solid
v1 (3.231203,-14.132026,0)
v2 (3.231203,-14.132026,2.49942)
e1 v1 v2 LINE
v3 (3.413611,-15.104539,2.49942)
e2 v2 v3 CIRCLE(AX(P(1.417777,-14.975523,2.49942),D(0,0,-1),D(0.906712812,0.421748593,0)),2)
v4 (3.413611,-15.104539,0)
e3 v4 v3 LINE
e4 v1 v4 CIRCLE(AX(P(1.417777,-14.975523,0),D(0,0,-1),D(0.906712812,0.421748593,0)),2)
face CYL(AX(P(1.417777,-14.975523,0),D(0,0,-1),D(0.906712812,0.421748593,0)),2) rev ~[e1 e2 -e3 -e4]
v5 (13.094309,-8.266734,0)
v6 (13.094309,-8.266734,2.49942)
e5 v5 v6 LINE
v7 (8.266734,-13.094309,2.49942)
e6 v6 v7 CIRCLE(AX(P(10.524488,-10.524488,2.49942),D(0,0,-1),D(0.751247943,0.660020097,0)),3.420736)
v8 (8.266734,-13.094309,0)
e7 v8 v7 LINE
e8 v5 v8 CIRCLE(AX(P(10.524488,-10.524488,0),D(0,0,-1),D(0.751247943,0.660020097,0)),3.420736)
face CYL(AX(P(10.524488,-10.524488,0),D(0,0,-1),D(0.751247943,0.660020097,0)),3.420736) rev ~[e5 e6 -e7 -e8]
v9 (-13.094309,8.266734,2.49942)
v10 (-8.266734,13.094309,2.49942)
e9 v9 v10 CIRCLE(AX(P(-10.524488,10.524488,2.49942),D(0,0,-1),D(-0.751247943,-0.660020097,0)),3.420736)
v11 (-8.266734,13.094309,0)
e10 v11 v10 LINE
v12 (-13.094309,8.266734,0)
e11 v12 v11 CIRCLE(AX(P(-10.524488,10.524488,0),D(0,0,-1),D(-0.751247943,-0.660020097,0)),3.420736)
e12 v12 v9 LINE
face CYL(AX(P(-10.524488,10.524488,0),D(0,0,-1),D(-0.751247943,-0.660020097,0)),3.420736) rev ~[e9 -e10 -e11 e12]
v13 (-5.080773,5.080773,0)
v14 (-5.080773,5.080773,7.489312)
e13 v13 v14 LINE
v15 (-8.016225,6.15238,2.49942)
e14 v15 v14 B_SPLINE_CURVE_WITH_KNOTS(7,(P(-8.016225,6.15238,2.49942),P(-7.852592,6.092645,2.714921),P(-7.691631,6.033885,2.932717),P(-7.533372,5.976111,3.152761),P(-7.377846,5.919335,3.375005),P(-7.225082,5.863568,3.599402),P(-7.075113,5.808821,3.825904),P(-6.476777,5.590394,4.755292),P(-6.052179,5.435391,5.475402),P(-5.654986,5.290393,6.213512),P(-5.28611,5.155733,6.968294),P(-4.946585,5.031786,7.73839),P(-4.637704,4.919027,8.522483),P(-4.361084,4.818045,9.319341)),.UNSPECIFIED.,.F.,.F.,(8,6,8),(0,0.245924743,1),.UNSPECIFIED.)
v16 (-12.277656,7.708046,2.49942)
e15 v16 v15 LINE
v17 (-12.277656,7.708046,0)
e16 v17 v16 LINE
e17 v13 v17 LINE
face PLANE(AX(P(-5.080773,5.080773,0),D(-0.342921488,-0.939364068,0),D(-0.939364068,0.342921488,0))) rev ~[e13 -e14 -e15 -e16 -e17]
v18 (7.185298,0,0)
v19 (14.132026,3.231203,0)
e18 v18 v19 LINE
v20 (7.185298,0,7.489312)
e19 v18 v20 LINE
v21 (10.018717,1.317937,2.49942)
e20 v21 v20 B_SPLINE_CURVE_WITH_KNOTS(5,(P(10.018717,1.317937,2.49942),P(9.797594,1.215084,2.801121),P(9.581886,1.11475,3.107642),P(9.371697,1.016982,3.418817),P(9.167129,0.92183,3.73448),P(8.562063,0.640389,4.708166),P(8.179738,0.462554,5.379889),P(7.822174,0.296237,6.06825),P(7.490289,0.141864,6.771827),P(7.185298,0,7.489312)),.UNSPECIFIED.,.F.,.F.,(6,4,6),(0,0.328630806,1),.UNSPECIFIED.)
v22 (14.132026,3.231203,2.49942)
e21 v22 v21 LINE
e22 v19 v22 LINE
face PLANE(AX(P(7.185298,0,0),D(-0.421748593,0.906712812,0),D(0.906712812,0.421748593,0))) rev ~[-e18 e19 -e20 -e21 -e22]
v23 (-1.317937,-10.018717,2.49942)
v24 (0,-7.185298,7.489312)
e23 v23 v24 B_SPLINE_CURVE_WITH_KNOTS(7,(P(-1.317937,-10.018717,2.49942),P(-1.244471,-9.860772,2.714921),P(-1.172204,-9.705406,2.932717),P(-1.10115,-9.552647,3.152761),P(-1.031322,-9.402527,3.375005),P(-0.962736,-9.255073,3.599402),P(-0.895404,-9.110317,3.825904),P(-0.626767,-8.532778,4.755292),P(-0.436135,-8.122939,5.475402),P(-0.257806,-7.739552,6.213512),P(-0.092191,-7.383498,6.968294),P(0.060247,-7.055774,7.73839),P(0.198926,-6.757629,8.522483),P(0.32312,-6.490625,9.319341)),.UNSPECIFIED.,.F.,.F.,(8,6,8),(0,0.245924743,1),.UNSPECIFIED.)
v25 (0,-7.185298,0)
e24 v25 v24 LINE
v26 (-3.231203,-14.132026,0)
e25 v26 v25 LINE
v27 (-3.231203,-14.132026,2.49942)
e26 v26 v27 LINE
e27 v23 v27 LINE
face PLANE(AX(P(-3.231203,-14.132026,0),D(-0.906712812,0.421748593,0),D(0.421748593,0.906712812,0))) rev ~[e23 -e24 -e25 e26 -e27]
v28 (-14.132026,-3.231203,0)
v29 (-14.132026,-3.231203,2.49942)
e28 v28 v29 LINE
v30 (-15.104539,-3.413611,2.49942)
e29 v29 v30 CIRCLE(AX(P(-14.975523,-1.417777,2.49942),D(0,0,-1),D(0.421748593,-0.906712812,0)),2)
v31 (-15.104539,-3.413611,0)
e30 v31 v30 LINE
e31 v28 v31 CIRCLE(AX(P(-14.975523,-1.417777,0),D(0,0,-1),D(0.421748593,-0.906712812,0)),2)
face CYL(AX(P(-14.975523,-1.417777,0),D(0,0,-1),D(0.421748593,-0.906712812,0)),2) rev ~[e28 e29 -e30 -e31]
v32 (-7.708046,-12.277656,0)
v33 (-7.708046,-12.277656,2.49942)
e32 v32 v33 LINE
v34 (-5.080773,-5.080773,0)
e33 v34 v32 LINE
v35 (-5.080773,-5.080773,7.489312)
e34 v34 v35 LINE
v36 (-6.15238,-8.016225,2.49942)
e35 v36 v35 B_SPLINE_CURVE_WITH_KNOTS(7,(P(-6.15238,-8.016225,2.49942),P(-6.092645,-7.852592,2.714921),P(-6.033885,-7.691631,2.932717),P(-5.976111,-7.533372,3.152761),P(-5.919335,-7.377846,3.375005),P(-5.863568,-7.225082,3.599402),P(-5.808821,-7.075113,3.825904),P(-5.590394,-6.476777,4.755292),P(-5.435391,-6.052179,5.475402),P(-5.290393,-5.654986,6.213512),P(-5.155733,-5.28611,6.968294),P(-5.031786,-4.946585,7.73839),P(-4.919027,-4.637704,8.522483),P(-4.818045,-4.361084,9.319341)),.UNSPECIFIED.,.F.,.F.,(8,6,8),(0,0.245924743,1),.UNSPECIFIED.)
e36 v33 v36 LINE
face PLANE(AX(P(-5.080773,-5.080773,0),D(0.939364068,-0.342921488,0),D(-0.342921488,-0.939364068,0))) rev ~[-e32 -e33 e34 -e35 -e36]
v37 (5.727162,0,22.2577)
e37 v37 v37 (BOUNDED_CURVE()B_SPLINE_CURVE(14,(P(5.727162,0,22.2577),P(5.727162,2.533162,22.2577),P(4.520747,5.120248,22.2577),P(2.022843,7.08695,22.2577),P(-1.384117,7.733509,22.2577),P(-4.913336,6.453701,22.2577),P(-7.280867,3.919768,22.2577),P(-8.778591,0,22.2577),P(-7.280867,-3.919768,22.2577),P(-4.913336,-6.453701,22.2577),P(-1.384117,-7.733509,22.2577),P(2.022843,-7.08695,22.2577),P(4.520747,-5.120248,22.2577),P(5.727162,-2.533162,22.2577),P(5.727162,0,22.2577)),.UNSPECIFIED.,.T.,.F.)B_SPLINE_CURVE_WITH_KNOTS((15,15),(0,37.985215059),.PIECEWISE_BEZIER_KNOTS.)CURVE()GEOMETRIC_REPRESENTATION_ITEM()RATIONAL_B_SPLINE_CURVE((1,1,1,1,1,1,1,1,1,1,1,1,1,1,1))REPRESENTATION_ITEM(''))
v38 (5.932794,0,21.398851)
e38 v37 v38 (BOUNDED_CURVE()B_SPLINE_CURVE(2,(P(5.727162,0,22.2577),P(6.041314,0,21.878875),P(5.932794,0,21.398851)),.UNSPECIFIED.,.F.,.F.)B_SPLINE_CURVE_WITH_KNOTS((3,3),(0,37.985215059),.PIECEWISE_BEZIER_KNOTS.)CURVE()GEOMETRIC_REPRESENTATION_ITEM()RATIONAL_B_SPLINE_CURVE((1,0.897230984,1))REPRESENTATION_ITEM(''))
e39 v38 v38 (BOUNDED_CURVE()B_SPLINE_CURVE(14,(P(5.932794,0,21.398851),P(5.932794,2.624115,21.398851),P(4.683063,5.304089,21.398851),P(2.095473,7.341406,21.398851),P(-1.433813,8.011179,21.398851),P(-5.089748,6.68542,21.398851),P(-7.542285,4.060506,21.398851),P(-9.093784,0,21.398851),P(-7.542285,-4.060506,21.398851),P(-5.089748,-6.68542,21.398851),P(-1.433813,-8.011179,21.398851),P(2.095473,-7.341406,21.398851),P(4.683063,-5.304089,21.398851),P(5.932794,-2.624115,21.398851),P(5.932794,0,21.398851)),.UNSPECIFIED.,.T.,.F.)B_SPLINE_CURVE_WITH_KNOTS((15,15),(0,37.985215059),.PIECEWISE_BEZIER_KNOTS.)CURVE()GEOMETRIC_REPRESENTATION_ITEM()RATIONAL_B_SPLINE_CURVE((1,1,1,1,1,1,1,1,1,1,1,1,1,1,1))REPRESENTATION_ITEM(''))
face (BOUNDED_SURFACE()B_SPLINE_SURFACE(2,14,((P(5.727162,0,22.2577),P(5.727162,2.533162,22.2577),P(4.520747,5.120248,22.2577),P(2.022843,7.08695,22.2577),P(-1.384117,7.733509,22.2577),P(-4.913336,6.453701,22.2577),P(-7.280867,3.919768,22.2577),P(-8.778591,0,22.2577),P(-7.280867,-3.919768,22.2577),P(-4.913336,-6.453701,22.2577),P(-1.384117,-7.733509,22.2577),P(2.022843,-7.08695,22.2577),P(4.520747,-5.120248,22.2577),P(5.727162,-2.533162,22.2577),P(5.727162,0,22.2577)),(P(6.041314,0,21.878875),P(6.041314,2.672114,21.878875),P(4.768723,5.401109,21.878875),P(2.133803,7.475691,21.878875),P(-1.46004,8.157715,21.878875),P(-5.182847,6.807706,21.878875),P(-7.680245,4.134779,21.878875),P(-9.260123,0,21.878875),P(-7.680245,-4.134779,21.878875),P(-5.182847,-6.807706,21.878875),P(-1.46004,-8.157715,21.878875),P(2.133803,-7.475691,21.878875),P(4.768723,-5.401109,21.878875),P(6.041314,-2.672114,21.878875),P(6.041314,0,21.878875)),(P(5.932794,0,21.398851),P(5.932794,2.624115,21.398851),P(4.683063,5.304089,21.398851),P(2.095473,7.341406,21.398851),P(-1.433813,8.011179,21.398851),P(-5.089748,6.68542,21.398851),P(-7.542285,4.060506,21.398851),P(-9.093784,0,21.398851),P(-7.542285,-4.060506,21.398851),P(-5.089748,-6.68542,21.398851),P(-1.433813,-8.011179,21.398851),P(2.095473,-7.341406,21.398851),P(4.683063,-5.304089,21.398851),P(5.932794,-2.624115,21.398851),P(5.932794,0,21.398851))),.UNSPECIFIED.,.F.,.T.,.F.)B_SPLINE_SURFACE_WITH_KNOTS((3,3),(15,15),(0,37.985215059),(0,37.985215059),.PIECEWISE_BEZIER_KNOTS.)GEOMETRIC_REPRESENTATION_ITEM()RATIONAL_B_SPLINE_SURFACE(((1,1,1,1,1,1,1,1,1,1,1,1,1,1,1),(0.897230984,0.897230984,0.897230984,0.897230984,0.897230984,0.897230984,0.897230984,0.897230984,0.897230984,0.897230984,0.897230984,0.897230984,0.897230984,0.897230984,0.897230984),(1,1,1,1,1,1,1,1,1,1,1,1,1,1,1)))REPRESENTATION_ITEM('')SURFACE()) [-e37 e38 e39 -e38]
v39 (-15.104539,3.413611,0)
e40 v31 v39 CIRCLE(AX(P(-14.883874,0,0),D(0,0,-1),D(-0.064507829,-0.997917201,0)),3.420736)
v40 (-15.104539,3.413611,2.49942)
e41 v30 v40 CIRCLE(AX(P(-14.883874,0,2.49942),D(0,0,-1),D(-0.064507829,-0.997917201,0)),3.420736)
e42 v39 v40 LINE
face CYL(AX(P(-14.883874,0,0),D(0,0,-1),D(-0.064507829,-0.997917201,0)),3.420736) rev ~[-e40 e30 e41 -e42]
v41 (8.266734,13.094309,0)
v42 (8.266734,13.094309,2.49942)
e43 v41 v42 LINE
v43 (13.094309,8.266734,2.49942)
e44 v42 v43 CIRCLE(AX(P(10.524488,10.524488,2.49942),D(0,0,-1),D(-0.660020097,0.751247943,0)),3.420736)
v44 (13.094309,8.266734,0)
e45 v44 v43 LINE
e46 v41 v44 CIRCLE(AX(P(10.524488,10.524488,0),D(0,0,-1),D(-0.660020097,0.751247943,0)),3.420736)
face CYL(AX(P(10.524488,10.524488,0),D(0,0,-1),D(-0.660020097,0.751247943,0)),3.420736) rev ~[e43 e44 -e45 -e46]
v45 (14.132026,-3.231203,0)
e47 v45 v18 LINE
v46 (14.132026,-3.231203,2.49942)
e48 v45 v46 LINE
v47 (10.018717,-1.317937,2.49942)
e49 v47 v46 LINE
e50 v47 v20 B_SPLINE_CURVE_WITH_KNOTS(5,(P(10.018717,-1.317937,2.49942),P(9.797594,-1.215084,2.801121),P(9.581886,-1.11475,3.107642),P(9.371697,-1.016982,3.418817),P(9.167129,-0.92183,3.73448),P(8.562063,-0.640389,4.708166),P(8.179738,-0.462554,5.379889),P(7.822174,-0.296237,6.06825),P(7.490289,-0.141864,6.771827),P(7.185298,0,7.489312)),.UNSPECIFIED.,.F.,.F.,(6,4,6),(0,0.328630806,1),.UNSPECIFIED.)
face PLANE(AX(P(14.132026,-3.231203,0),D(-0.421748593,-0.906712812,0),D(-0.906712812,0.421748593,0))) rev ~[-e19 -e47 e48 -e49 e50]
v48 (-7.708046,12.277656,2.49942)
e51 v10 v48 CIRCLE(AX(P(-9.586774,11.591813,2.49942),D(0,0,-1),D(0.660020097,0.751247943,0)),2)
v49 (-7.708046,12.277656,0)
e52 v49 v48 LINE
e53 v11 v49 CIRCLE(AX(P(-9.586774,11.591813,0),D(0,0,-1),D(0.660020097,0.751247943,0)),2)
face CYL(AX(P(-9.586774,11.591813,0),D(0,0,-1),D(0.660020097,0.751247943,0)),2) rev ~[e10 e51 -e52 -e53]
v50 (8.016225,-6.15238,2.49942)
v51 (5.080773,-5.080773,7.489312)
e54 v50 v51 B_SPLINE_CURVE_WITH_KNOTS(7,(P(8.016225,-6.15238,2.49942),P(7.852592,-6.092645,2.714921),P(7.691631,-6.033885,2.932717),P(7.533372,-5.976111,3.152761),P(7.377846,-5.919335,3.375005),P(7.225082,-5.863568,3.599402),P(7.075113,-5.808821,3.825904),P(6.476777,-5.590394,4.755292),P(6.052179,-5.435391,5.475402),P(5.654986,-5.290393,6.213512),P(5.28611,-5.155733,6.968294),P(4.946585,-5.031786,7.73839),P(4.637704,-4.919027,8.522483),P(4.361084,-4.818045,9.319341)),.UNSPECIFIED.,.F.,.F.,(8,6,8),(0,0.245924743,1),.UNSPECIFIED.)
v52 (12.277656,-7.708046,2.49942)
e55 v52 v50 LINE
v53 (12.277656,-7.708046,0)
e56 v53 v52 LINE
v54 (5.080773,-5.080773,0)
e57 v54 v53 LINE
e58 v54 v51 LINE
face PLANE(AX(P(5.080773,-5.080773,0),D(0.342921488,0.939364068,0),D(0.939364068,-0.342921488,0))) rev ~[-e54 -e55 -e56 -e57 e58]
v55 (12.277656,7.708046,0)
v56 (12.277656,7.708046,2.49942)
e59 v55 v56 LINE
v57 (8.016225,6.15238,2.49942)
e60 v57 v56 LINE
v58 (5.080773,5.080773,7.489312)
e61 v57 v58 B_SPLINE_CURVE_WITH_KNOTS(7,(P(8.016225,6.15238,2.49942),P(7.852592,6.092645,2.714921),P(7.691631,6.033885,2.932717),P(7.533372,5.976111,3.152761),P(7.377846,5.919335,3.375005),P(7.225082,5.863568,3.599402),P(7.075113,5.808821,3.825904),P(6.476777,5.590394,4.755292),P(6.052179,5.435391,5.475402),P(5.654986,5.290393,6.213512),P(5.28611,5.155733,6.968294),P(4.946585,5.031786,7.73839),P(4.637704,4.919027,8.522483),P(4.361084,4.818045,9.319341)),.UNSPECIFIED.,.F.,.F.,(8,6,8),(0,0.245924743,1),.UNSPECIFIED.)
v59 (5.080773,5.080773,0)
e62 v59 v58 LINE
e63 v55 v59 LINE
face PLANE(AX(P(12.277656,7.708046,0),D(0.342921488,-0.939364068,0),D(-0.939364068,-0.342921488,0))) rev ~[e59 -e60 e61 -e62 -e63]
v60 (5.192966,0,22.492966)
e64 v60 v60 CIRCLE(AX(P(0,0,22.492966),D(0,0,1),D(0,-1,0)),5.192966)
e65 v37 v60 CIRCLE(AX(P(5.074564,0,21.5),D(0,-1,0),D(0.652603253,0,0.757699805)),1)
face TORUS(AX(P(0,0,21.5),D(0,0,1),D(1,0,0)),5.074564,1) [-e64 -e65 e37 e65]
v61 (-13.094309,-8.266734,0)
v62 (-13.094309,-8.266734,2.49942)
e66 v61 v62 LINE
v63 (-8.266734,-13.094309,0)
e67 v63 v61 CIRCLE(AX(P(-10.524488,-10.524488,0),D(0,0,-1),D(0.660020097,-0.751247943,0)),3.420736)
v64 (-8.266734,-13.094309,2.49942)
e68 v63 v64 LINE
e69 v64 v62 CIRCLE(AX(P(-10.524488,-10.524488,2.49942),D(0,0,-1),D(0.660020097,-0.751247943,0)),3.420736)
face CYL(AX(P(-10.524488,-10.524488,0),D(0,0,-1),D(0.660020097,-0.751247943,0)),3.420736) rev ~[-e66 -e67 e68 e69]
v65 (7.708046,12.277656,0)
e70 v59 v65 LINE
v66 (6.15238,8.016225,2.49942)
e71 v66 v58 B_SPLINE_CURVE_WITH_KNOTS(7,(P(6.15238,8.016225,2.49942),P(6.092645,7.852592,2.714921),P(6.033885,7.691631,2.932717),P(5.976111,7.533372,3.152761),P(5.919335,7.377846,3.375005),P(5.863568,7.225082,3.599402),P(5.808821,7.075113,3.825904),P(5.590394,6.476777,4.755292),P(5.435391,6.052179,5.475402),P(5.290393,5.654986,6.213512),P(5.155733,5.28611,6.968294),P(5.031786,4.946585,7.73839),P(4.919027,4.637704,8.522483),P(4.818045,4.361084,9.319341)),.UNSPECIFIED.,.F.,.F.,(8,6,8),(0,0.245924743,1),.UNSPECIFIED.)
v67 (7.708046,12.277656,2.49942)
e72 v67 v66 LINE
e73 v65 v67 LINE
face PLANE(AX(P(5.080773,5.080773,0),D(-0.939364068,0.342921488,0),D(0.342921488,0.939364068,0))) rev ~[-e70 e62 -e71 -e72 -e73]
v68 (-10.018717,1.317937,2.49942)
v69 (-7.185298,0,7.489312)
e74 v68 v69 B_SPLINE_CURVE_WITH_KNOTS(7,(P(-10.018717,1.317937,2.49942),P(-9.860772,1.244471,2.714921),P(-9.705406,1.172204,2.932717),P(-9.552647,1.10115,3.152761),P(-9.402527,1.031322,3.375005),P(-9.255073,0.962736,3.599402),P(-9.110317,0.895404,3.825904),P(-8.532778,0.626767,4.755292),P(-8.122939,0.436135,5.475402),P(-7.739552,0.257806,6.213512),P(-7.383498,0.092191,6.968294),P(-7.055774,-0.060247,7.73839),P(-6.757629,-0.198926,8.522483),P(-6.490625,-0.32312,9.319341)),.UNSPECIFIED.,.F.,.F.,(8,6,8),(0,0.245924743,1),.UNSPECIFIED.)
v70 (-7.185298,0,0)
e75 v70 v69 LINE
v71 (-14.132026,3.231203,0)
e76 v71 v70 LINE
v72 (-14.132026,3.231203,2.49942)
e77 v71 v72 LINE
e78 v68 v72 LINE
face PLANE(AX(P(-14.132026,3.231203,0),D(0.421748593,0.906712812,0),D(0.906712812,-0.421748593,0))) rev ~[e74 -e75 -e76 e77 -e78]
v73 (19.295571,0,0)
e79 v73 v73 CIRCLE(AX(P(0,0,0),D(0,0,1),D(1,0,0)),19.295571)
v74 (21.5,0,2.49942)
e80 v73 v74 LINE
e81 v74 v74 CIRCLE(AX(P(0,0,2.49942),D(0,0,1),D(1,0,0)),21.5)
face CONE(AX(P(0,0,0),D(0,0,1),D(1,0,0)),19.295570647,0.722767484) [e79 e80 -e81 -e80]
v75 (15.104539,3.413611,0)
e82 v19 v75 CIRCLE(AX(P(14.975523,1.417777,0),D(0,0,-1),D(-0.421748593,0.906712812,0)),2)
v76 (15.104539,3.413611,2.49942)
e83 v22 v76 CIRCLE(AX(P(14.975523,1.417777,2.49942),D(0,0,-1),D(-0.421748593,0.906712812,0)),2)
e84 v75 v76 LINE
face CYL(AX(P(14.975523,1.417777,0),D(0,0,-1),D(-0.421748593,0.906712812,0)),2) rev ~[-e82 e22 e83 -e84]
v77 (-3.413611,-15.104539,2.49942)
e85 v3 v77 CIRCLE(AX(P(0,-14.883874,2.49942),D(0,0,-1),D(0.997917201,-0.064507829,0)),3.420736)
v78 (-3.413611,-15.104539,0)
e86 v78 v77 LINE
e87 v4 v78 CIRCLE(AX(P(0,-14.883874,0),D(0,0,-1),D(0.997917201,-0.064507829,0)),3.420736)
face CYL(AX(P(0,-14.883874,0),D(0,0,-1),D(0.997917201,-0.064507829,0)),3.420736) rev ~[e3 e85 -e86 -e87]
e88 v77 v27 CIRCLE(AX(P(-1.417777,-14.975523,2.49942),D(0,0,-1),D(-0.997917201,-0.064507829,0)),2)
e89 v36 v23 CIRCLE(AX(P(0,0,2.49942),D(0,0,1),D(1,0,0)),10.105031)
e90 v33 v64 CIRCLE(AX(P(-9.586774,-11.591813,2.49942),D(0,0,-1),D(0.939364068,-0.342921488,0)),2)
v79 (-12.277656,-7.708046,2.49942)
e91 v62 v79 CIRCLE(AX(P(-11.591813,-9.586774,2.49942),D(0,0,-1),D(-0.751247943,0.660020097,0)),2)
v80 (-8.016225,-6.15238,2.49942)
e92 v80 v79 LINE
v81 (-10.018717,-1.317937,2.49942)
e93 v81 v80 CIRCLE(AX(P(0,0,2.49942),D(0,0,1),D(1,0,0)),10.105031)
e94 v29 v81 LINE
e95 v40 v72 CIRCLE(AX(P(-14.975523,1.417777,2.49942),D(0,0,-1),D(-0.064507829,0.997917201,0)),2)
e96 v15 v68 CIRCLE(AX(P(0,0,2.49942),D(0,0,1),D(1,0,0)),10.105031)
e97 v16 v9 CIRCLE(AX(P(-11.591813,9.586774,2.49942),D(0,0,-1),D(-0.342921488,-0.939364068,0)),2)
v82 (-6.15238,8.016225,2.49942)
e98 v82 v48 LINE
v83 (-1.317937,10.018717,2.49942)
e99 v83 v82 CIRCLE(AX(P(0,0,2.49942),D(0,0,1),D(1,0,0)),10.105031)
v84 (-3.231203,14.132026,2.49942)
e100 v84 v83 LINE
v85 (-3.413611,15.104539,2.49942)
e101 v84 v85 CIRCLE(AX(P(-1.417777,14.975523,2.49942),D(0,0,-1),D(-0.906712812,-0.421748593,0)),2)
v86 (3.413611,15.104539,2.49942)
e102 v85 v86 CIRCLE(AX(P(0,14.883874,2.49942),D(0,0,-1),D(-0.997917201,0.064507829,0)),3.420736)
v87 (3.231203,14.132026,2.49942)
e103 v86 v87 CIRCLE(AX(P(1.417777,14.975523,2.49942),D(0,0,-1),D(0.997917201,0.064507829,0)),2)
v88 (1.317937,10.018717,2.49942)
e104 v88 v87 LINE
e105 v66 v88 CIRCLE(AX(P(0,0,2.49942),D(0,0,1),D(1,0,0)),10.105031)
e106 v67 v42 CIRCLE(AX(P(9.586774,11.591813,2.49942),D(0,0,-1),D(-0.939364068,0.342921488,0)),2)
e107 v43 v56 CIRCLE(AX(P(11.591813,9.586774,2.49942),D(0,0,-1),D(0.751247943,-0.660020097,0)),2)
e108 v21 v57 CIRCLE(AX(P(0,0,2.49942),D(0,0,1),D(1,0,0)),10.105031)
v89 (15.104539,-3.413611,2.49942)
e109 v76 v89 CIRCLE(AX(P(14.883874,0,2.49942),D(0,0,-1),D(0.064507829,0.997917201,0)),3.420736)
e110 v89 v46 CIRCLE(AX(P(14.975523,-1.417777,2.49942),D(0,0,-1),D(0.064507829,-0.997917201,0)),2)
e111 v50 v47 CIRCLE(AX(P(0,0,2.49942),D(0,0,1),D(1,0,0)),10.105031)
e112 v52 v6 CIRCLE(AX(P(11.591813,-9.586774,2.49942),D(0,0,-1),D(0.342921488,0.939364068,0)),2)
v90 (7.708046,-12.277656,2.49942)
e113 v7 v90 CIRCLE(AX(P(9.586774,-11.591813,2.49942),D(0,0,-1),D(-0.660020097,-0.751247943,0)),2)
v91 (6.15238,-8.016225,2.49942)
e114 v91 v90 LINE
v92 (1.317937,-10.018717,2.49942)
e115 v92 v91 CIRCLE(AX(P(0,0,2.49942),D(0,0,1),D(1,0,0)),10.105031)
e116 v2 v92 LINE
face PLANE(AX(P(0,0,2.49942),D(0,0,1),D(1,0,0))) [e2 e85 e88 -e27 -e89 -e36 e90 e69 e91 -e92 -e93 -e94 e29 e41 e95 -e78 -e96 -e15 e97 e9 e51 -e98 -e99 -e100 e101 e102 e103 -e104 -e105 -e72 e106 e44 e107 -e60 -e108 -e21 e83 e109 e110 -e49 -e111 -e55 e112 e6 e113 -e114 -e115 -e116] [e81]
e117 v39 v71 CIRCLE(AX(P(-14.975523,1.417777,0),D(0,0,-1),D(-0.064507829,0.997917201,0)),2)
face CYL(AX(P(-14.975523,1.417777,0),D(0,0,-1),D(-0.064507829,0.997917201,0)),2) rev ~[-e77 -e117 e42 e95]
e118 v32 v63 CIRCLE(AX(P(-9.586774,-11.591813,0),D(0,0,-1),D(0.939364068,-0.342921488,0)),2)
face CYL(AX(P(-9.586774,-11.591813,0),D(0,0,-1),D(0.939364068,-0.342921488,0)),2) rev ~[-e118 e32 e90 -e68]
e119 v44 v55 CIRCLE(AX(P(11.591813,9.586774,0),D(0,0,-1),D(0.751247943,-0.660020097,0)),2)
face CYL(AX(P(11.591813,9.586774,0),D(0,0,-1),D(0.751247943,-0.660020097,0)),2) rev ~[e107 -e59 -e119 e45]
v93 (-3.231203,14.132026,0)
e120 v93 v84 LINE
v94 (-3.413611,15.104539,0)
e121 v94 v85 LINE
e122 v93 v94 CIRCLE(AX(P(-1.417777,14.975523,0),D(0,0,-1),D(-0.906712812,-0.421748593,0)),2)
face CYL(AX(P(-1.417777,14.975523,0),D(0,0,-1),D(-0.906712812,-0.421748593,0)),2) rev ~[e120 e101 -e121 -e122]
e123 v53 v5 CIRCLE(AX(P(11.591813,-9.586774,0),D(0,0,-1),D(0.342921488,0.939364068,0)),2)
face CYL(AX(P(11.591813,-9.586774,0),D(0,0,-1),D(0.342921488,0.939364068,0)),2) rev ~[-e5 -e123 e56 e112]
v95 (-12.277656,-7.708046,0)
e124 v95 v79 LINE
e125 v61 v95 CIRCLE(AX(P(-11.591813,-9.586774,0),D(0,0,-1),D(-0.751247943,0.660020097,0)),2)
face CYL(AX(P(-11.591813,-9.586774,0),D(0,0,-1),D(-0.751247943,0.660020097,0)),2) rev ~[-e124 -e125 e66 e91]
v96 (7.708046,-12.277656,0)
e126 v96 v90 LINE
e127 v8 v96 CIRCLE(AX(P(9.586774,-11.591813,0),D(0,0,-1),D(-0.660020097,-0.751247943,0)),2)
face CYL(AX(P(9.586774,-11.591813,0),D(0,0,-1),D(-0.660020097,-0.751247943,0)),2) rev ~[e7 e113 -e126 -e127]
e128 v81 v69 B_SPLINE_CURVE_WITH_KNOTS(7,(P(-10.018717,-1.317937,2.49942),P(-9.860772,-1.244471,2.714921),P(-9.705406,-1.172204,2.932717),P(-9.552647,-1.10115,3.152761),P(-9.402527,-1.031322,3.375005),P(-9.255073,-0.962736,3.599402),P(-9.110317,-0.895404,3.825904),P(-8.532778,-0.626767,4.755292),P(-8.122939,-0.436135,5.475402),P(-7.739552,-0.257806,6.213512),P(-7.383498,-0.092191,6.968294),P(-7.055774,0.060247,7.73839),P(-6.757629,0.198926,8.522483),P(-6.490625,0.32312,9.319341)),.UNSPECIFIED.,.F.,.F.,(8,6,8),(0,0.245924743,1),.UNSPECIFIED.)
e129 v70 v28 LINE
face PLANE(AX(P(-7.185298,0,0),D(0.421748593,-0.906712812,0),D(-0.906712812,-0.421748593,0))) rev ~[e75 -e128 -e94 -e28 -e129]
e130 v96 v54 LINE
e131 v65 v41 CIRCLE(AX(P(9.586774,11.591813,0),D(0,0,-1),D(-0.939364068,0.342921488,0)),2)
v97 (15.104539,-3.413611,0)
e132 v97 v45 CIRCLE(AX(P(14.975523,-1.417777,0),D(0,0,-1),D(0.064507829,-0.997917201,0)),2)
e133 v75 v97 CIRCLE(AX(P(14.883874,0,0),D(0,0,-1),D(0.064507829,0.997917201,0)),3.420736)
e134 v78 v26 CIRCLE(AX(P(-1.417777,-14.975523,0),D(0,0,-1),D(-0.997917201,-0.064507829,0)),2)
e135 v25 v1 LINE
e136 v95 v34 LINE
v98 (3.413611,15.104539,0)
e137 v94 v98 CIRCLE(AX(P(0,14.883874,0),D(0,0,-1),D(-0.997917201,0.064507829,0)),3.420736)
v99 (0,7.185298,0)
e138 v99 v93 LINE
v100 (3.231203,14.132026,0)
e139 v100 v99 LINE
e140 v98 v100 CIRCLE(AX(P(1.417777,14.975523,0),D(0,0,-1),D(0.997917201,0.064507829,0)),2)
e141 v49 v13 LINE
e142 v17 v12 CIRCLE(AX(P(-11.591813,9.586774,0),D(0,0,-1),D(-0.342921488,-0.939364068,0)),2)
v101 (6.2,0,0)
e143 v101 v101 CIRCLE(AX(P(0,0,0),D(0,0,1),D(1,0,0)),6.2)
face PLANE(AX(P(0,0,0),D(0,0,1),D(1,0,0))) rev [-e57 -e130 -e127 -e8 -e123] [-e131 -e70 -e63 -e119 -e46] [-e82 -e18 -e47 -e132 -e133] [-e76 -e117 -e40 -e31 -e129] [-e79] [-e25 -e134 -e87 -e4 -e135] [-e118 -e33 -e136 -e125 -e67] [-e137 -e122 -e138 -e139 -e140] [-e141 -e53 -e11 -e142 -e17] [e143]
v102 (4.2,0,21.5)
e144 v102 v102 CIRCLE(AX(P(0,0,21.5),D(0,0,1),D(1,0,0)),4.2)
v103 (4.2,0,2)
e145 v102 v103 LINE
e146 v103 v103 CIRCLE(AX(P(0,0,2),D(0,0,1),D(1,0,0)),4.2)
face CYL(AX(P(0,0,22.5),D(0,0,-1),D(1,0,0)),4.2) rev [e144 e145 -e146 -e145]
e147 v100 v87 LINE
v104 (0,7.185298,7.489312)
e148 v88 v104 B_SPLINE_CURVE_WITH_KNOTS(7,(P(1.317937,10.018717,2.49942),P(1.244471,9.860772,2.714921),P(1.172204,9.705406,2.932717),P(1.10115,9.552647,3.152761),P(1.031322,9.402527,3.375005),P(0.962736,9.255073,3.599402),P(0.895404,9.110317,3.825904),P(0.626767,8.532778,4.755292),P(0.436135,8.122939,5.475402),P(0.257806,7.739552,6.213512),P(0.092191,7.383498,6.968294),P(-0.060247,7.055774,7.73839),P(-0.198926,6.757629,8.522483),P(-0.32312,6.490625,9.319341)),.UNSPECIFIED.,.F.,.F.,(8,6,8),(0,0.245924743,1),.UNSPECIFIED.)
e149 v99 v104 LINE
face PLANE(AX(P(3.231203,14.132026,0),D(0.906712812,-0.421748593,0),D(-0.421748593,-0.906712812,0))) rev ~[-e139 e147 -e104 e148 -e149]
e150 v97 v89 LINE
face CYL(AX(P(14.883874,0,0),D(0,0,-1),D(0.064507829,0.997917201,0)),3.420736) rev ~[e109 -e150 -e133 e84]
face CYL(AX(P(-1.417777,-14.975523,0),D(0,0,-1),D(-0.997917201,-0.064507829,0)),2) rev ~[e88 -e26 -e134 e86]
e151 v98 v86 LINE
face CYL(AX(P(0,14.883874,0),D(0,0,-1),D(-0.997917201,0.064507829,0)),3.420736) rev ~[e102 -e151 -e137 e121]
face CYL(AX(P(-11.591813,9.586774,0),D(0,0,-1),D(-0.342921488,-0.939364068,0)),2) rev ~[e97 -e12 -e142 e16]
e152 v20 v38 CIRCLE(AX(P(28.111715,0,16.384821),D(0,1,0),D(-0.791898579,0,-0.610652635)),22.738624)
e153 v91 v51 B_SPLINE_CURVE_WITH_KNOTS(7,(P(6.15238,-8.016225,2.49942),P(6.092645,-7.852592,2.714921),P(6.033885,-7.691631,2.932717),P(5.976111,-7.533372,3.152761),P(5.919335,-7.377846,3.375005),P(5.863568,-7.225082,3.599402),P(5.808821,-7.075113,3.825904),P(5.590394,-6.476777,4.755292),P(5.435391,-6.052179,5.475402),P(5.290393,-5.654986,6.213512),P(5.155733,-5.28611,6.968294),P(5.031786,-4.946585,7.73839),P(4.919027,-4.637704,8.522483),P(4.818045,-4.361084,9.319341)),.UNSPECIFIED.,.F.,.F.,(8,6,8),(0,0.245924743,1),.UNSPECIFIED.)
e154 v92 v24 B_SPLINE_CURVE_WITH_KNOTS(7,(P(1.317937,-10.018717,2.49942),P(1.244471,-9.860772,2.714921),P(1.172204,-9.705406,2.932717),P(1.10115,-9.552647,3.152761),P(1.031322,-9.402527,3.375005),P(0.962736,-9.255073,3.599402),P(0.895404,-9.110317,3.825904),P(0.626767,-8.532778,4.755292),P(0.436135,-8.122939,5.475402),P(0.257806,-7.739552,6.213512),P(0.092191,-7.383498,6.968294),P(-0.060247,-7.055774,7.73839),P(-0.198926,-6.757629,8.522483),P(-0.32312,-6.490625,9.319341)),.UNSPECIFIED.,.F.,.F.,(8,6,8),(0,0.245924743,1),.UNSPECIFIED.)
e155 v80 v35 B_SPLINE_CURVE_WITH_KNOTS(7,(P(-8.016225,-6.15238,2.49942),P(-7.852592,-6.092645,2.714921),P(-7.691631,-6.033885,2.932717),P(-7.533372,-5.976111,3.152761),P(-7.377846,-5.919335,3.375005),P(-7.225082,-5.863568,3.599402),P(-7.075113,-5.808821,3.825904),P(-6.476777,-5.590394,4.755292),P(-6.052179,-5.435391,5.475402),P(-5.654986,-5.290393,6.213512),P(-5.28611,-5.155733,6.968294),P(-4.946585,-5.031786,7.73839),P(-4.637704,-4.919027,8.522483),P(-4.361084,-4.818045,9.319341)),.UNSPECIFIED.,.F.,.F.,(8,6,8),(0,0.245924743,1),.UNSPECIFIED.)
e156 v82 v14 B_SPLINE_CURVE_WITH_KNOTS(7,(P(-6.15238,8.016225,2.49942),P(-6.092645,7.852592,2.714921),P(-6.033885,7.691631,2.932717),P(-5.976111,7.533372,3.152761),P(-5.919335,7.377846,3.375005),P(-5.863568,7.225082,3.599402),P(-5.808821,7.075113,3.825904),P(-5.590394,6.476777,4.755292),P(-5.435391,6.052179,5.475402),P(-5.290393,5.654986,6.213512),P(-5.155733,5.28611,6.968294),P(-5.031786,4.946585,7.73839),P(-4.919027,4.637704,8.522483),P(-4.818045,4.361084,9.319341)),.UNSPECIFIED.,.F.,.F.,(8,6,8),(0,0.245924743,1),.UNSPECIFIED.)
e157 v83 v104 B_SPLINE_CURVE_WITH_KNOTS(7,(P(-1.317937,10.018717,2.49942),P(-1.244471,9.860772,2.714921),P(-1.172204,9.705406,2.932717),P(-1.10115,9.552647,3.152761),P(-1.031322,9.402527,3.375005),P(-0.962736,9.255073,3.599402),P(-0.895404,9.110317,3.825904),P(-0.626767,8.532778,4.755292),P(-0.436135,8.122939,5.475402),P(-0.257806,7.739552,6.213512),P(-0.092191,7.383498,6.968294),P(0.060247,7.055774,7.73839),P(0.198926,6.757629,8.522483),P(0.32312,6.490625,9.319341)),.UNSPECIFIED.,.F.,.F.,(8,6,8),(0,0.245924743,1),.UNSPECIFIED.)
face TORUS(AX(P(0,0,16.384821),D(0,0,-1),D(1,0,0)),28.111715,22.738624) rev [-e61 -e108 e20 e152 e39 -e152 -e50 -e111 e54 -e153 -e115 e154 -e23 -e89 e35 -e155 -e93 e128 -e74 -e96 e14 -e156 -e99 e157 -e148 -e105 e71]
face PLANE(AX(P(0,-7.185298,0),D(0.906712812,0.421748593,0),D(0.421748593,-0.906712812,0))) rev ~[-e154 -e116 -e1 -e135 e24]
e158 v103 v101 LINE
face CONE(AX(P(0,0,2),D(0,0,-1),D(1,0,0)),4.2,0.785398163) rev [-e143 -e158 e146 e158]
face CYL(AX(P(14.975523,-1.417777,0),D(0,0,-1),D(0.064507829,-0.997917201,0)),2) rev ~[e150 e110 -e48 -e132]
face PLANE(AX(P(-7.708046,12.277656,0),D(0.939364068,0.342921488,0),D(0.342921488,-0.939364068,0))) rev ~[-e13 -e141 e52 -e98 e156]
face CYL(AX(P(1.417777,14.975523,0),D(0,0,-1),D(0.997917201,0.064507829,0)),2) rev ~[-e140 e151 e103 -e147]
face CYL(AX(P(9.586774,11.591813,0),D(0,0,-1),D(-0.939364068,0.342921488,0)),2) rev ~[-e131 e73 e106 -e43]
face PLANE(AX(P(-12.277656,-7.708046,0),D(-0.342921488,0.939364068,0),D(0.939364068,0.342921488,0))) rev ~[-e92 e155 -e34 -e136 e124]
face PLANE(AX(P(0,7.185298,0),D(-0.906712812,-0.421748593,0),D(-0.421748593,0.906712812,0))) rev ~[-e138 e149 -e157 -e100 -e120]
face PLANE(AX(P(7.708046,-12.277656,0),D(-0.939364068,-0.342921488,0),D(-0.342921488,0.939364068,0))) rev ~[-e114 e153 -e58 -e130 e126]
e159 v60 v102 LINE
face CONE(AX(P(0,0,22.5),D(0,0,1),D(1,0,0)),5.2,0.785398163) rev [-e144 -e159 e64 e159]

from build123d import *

# Parameters (mm, degrees)
F2_SIZE  = 2
F4_DEPTH = 25
F5_R     = 1


# Not quite as in the source:
# - a fillet or chamfer that OpenCascade refuses, or shapes differently, is made with other operations: its cross-section is extruded or revolved along the edge and cut away or added


with BuildPart() as f1:
    # F0 (on Front) → F1 (revolve)
    with BuildSketch(Plane.XZ):
        with BuildLine():
            Line((4.2, 22.5), (4.2, 0))
            Line((4.2, 0), (19.2955706467, 0))
            Line((19.2955706467, 0), (21.5, 2.499420478))
            Line((21.5, 2.499420478), (20.5, 2.499420478))
            Line((20.5, 2.499420478), (10.1050306112, 2.499420478))
            ThreePointArc((10.1050306112, 2.499420478), (5.8563757844, 11.7216769606), (6.0455347411, 21.8737851828))
            Line((6.0455347411, 21.8737851828), (5.5262264796, 22.5))
            Line((5.5262264796, 22.5), (4.2, 22.5))
        make_face()
    revolve(axis=Axis((0, 0, 11.7304213345), (0, 0, 1)))

    # F2
    f2_edges = [f1.edges().sort_by_distance(p)[0] for p in [
        (-4.2, 0, 0),
    ]]
    chamfer(f2_edges, length=F2_SIZE)

    # F3 (on face) → F4 (cut)
    with BuildSketch(Plane(origin=(0, 0, 0), x_dir=(1, 0, 0), z_dir=(0, 0, -1))):
        with BuildLine():
            ThreePointArc((14.132025682, -3.23120262), (14.6068235272, -3.3834984393), (15.104538526, -3.4136113971))
            ThreePointArc((15.104538526, -3.4136113971), (18.3046103696, 0), (15.104538526, 3.4136113971))
            ThreePointArc((15.104538526, 3.4136113971), (14.6068235272, 3.3834984393), (14.132025682, 3.23120262))
            Line((14.132025682, 3.23120262), (7.1852975525, 0))
            Line((7.1852975525, 0), (14.132025682, -3.23120262))
        make_face()
        with BuildLine():
            ThreePointArc((12.2776564756, 7.7080459076), (12.7210786582, 7.9360892771), (13.0943093857, 8.2667338512))
            ThreePointArc((13.0943093857, 8.2667338512), (12.9433141193, 12.9433141193), (8.2667338512, 13.0943093857))
            ThreePointArc((8.2667338512, 13.0943093857), (7.9360892771, 12.7210786582), (7.7080459076, 12.2776564756))
            Line((7.7080459076, 12.2776564756), (5.0807726242, 5.0807726242))
            Line((5.0807726242, 5.0807726242), (12.2776564756, 7.7080459076))
        make_face()
        with BuildLine():
            ThreePointArc((3.23120262, 14.132025682), (3.3834984393, 14.6068235272), (3.4136113971, 15.104538526))
            ThreePointArc((3.4136113971, 15.104538526), (0, 18.3046103696), (-3.4136113971, 15.104538526))
            ThreePointArc((-3.4136113971, 15.104538526), (-3.3834984393, 14.6068235272), (-3.23120262, 14.132025682))
            Line((-3.23120262, 14.132025682), (0, 7.1852975525))
            Line((0, 7.1852975525), (3.23120262, 14.132025682))
        make_face()
        with BuildLine():
            ThreePointArc((-7.7080459076, 12.2776564756), (-7.9360892771, 12.7210786582), (-8.2667338512, 13.0943093857))
            ThreePointArc((-8.2667338512, 13.0943093857), (-12.9433141193, 12.9433141193), (-13.0943093857, 8.2667338512))
            ThreePointArc((-13.0943093857, 8.2667338512), (-12.7210786582, 7.9360892771), (-12.2776564756, 7.7080459076))
            Line((-12.2776564756, 7.7080459076), (-5.0807726242, 5.0807726242))
            Line((-5.0807726242, 5.0807726242), (-7.7080459076, 12.2776564756))
        make_face()
        with BuildLine():
            ThreePointArc((-14.132025682, 3.23120262), (-14.6068235272, 3.3834984393), (-15.104538526, 3.4136113971))
            ThreePointArc((-15.104538526, 3.4136113971), (-18.3046103696, 0), (-15.104538526, -3.4136113971))
            ThreePointArc((-15.104538526, -3.4136113971), (-14.6068235272, -3.3834984393), (-14.132025682, -3.23120262))
            Line((-14.132025682, -3.23120262), (-7.1852975525, 0))
            Line((-7.1852975525, 0), (-14.132025682, 3.23120262))
        make_face()
        with BuildLine():
            ThreePointArc((-12.2776564756, -7.7080459076), (-12.7210786582, -7.9360892771), (-13.0943093857, -8.2667338512))
            ThreePointArc((-13.0943093857, -8.2667338512), (-12.9433141193, -12.9433141193), (-8.2667338512, -13.0943093857))
            ThreePointArc((-8.2667338512, -13.0943093857), (-7.9360892771, -12.7210786582), (-7.7080459076, -12.2776564756))
            Line((-7.7080459076, -12.2776564756), (-5.0807726242, -5.0807726242))
            Line((-5.0807726242, -5.0807726242), (-12.2776564756, -7.7080459076))
        make_face()
        with BuildLine():
            ThreePointArc((-3.23120262, -14.132025682), (-3.3834984393, -14.6068235272), (-3.4136113971, -15.104538526))
            ThreePointArc((-3.4136113971, -15.104538526), (0, -18.3046103696), (3.4136113971, -15.104538526))
            ThreePointArc((3.4136113971, -15.104538526), (3.3834984393, -14.6068235272), (3.23120262, -14.132025682))
            Line((3.23120262, -14.132025682), (0, -7.1852975525))
            Line((0, -7.1852975525), (-3.23120262, -14.132025682))
        make_face()
        with BuildLine():
            ThreePointArc((7.7080459076, -12.2776564756), (7.9360892771, -12.7210786582), (8.2667338512, -13.0943093857))
            ThreePointArc((8.2667338512, -13.0943093857), (12.9433141193, -12.9433141193), (13.0943093857, -8.2667338512))
            ThreePointArc((13.0943093857, -8.2667338512), (12.7210786582, -7.9360892771), (12.2776564756, -7.7080459076))
            Line((12.2776564756, -7.7080459076), (5.0807726242, -5.0807726242))
            Line((5.0807726242, -5.0807726242), (7.7080459076, -12.2776564756))
        make_face()
    extrude(amount=-F4_DEPTH, mode=Mode.SUBTRACT)

    # F5
    f5_edges = [f1.edges().sort_by_distance(p)[0] for p in [
        (-6.045535, 0, 21.873785),
    ]]
    fillet(f5_edges, radius=F5_R)

    # F6: fillet of radius 1 on 1 edges, made by hand

    # F6_s1 → F6_t2 (revolve, cut)
    with BuildSketch(Plane.XZ):
        with BuildLine():
            ThreePointArc((5.7271677505, 22.2576998048), (5.4226307234, 22.4374699475), (5.0745644975, 22.5))
            Line((5.0745644975, 22.5), (5.5262264796, 22.5))
            ThreePointArc((5.5262264796, 22.5), (5.6266952661, 22.3788483691), (5.7271677505, 22.2576998048))
        make_face()
    revolve(axis=Axis((0, 0, 22.5), (0, 0, 1)), mode=Mode.SUBTRACT)

    # F7: chamfer of 1 on 1 edges, made by hand

    # F7_s1 → F7_t2 (revolve, cut)
    with BuildSketch(Plane.XZ):
        Polygon((5.2, 22.5), (4.2, 21.5), (4.2, 22.5), align=None)
    revolve(axis=Axis((0, 0, 22.5), (0, 0, 1)), mode=Mode.SUBTRACT)


solid = f1.part
